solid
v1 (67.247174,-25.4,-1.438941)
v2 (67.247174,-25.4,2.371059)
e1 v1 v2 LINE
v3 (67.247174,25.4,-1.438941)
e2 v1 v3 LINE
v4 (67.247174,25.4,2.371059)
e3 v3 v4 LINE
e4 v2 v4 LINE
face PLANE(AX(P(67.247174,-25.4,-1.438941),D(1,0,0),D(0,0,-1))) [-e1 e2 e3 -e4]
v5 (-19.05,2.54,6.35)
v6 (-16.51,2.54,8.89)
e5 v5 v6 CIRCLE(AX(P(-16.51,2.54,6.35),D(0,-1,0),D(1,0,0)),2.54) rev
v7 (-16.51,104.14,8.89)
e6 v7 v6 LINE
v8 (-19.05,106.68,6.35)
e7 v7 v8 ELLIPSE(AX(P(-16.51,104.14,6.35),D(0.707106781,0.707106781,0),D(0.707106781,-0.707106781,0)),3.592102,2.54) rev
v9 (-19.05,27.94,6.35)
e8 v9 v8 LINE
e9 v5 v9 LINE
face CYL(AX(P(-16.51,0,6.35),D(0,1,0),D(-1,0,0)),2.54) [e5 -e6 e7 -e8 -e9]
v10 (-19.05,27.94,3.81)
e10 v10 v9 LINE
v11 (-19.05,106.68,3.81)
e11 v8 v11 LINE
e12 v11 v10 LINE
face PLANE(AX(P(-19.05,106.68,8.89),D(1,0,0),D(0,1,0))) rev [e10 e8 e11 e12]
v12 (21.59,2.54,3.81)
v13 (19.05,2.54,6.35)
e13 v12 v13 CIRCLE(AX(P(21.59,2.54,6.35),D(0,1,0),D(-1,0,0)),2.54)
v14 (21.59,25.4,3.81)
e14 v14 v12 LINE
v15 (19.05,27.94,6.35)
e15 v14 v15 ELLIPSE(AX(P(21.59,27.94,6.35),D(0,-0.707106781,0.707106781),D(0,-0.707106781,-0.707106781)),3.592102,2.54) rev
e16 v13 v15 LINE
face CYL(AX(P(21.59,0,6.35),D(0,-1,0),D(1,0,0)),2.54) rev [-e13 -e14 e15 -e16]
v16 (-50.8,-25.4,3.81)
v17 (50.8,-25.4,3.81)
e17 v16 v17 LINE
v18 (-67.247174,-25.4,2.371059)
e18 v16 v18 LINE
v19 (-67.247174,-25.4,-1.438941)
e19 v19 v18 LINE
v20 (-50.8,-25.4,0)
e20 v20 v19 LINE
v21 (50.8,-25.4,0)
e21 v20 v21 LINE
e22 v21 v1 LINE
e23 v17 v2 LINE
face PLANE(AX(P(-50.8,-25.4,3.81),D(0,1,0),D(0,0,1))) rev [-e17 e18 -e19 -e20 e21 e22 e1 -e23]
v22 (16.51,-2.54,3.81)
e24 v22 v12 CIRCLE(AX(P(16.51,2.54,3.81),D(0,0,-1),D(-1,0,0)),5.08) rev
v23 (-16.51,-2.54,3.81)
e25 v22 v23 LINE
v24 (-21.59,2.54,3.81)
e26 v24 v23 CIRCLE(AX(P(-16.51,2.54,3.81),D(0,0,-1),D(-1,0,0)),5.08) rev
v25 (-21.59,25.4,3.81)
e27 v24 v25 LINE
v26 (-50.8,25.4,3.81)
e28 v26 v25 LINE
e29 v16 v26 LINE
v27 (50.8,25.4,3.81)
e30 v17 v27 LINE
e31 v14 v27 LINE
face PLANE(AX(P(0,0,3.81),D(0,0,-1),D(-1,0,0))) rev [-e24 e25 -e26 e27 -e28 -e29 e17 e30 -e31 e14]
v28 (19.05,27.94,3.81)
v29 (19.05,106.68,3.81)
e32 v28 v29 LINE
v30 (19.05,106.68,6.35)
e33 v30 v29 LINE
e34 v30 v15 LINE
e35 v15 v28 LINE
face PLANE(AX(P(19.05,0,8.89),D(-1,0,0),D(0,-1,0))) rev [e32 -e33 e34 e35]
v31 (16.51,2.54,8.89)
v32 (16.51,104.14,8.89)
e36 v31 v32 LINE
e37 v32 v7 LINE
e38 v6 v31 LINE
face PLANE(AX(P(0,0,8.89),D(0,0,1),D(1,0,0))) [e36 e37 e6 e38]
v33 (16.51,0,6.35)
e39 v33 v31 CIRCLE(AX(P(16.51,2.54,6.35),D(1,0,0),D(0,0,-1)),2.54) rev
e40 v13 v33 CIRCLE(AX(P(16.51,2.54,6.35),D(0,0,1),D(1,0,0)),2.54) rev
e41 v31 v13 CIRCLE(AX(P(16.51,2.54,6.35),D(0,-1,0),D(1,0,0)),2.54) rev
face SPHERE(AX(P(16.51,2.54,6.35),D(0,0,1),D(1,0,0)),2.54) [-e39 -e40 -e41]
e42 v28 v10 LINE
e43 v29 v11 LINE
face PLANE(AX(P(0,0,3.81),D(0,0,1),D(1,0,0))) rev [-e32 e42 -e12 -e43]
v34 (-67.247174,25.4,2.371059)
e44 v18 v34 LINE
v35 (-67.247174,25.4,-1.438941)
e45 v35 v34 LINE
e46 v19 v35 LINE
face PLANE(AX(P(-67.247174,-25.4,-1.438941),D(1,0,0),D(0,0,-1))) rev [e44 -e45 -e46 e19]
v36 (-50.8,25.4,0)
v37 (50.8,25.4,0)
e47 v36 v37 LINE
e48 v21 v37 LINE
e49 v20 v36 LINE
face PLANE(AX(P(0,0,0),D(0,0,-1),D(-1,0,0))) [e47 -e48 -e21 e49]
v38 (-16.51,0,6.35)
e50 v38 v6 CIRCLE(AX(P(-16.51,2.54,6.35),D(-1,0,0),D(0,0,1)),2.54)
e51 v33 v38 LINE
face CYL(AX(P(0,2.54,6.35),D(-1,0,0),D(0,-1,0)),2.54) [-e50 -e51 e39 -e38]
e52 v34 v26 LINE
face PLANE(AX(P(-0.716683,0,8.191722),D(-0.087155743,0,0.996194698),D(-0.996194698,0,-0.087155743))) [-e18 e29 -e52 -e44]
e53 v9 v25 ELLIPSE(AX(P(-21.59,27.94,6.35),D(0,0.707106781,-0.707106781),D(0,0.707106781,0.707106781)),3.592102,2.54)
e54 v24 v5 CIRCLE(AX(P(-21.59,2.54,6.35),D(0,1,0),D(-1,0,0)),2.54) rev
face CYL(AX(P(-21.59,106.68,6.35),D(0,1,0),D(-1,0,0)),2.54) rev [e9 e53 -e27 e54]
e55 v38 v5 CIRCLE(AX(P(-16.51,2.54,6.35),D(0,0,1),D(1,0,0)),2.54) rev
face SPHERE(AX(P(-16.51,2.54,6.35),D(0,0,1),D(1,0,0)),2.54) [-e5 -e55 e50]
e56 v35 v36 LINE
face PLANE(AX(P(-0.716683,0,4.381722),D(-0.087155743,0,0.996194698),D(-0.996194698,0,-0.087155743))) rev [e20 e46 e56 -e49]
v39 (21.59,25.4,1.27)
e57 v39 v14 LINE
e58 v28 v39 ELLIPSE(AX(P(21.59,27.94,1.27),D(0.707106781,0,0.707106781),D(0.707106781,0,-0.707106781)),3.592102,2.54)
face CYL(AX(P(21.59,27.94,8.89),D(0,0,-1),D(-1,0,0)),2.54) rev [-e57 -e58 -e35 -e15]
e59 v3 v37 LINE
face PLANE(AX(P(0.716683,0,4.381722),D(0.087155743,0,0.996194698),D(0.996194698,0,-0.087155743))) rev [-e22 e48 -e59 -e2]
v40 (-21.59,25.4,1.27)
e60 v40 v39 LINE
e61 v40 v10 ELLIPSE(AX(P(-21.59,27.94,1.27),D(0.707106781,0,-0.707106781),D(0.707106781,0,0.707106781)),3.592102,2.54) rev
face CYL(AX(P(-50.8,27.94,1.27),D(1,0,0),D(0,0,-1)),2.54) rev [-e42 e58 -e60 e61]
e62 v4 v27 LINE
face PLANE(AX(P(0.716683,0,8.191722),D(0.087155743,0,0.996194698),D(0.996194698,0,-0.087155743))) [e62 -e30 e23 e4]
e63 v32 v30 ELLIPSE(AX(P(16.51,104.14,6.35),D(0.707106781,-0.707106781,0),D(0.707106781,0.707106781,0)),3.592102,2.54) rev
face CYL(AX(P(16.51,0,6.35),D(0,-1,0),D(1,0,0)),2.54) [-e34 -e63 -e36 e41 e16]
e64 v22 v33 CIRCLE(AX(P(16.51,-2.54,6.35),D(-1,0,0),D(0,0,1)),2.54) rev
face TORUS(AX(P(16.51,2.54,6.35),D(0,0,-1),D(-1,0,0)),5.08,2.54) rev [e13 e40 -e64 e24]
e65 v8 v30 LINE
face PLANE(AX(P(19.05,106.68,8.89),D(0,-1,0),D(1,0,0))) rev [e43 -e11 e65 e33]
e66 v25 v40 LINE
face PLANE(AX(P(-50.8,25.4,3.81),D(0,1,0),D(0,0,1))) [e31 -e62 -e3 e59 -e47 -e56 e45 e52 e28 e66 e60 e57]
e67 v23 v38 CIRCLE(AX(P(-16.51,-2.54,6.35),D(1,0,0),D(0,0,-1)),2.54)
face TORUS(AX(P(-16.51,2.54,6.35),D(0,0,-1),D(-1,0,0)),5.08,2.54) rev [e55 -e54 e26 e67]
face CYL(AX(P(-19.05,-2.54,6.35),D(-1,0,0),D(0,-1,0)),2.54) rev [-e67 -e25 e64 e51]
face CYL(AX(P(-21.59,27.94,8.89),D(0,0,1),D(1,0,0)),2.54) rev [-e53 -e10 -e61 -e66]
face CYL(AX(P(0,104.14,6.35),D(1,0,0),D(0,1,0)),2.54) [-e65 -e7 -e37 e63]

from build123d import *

# Parameters (mm, degrees)
SKETCH1_W           = 101.6
SKETCH1_H           = 50.8
BOSS_EXTRUDE2_DEPTH = 3.8099999999999996
SKETCH2_W           = 50.8
SKETCH2_H           = 16.50999999999999
BOSS_EXTRUDE4_DEPTH = 3.8099999999999996
BOSS_EXTRUDE5_DEPTH = 5.08
FILLET1_R           = 2.54
FILLET18_R          = 2.54
FILLET19_R          = 2.54
FILLET20_R          = 2.54


with BuildPart() as part:
    # Sketch1 → Boss-Extrude2 (new body)
    with BuildSketch(Plane.XY):
        Rectangle(SKETCH1_W, SKETCH1_H)
    extrude(amount=BOSS_EXTRUDE2_DEPTH)

    # Sketch2 → Boss-Extrude4 (add, along a direction that is not the sketch's normal)
    with BuildSketch(Plane(origin=(0.71668285194542, 0, 8.191722482228297), x_dir=(0, 1, 0), z_dir=(-0.08715574274765836, 0, -0.9961946980917455))):
        with Locations((-3.55e-15, 58.52962728319207)):
            Rectangle(SKETCH2_W, SKETCH2_H)
    boss_extrude4 = extrude(amount=BOSS_EXTRUDE4_DEPTH, dir=(0, 0, -1))

    # Mirror1: Boss-Extrude4 across plane
    add(boss_extrude4.mirror(Plane.ZY))

    # Sketch4 → Boss-Extrude5 (add)
    with BuildSketch(Plane.XY.offset(3.8099999999999996)):
        Polygon((-19.05, 0), (19.05, 7e-15), (19.049999999999972, 106.68), (-19.050000000000015, 106.67999999999999), align=None)
    extrude(amount=BOSS_EXTRUDE5_DEPTH)

    # Fillet1
    fillet1_edges = [part.edges().sort_by_distance(p)[0] for p in [
        (-19.05, 12.700000000000003, 3.8099999999999996),
        (0, 3.5e-15, 3.8099999999999996),
        (-19.05, 0, 6.35),
        (19.049999999999997, 12.700000000000001, 3.8099999999999996),
        (19.05, 7e-15, 6.35),
        (-2.132e-14, 106.68, 8.89),
        (-19.050000000000008, 53.339999999999996, 8.89),
        (0, 3.5e-15, 8.89),
        (19.049999999999986, 53.34000000000001, 8.89),
    ]]
    fillet(fillet1_edges, radius=FILLET1_R - 0.0001)  # a hair under: the kernel refuses the full size

    # Fillet18
    fillet18_edges = [part.edges().sort_by_distance(p)[0] for p in [
        (-7.11e-15, 25.399999999999995, 3.8099999999999996),
    ]]
    fillet(fillet18_edges, radius=FILLET18_R)

    # Fillet19
    fillet19_edges = [part.edges().sort_by_distance(p)[0] for p in [
        (19.049999999999994, 25.399999999999995, 3.8099499999999993),
    ]]
    fillet(fillet19_edges, radius=FILLET19_R - 0.0001)  # a hair under: the kernel refuses the full size

    # Fillet20
    fillet20_edges = [part.edges().sort_by_distance(p)[0] for p in [
        (-19.050000000000004, 25.399999999999995, 3.8099499999999997),
    ]]
    fillet(fillet20_edges, radius=FILLET20_R - 0.0001)  # a hair under: the kernel refuses the full size


solid = part.part
